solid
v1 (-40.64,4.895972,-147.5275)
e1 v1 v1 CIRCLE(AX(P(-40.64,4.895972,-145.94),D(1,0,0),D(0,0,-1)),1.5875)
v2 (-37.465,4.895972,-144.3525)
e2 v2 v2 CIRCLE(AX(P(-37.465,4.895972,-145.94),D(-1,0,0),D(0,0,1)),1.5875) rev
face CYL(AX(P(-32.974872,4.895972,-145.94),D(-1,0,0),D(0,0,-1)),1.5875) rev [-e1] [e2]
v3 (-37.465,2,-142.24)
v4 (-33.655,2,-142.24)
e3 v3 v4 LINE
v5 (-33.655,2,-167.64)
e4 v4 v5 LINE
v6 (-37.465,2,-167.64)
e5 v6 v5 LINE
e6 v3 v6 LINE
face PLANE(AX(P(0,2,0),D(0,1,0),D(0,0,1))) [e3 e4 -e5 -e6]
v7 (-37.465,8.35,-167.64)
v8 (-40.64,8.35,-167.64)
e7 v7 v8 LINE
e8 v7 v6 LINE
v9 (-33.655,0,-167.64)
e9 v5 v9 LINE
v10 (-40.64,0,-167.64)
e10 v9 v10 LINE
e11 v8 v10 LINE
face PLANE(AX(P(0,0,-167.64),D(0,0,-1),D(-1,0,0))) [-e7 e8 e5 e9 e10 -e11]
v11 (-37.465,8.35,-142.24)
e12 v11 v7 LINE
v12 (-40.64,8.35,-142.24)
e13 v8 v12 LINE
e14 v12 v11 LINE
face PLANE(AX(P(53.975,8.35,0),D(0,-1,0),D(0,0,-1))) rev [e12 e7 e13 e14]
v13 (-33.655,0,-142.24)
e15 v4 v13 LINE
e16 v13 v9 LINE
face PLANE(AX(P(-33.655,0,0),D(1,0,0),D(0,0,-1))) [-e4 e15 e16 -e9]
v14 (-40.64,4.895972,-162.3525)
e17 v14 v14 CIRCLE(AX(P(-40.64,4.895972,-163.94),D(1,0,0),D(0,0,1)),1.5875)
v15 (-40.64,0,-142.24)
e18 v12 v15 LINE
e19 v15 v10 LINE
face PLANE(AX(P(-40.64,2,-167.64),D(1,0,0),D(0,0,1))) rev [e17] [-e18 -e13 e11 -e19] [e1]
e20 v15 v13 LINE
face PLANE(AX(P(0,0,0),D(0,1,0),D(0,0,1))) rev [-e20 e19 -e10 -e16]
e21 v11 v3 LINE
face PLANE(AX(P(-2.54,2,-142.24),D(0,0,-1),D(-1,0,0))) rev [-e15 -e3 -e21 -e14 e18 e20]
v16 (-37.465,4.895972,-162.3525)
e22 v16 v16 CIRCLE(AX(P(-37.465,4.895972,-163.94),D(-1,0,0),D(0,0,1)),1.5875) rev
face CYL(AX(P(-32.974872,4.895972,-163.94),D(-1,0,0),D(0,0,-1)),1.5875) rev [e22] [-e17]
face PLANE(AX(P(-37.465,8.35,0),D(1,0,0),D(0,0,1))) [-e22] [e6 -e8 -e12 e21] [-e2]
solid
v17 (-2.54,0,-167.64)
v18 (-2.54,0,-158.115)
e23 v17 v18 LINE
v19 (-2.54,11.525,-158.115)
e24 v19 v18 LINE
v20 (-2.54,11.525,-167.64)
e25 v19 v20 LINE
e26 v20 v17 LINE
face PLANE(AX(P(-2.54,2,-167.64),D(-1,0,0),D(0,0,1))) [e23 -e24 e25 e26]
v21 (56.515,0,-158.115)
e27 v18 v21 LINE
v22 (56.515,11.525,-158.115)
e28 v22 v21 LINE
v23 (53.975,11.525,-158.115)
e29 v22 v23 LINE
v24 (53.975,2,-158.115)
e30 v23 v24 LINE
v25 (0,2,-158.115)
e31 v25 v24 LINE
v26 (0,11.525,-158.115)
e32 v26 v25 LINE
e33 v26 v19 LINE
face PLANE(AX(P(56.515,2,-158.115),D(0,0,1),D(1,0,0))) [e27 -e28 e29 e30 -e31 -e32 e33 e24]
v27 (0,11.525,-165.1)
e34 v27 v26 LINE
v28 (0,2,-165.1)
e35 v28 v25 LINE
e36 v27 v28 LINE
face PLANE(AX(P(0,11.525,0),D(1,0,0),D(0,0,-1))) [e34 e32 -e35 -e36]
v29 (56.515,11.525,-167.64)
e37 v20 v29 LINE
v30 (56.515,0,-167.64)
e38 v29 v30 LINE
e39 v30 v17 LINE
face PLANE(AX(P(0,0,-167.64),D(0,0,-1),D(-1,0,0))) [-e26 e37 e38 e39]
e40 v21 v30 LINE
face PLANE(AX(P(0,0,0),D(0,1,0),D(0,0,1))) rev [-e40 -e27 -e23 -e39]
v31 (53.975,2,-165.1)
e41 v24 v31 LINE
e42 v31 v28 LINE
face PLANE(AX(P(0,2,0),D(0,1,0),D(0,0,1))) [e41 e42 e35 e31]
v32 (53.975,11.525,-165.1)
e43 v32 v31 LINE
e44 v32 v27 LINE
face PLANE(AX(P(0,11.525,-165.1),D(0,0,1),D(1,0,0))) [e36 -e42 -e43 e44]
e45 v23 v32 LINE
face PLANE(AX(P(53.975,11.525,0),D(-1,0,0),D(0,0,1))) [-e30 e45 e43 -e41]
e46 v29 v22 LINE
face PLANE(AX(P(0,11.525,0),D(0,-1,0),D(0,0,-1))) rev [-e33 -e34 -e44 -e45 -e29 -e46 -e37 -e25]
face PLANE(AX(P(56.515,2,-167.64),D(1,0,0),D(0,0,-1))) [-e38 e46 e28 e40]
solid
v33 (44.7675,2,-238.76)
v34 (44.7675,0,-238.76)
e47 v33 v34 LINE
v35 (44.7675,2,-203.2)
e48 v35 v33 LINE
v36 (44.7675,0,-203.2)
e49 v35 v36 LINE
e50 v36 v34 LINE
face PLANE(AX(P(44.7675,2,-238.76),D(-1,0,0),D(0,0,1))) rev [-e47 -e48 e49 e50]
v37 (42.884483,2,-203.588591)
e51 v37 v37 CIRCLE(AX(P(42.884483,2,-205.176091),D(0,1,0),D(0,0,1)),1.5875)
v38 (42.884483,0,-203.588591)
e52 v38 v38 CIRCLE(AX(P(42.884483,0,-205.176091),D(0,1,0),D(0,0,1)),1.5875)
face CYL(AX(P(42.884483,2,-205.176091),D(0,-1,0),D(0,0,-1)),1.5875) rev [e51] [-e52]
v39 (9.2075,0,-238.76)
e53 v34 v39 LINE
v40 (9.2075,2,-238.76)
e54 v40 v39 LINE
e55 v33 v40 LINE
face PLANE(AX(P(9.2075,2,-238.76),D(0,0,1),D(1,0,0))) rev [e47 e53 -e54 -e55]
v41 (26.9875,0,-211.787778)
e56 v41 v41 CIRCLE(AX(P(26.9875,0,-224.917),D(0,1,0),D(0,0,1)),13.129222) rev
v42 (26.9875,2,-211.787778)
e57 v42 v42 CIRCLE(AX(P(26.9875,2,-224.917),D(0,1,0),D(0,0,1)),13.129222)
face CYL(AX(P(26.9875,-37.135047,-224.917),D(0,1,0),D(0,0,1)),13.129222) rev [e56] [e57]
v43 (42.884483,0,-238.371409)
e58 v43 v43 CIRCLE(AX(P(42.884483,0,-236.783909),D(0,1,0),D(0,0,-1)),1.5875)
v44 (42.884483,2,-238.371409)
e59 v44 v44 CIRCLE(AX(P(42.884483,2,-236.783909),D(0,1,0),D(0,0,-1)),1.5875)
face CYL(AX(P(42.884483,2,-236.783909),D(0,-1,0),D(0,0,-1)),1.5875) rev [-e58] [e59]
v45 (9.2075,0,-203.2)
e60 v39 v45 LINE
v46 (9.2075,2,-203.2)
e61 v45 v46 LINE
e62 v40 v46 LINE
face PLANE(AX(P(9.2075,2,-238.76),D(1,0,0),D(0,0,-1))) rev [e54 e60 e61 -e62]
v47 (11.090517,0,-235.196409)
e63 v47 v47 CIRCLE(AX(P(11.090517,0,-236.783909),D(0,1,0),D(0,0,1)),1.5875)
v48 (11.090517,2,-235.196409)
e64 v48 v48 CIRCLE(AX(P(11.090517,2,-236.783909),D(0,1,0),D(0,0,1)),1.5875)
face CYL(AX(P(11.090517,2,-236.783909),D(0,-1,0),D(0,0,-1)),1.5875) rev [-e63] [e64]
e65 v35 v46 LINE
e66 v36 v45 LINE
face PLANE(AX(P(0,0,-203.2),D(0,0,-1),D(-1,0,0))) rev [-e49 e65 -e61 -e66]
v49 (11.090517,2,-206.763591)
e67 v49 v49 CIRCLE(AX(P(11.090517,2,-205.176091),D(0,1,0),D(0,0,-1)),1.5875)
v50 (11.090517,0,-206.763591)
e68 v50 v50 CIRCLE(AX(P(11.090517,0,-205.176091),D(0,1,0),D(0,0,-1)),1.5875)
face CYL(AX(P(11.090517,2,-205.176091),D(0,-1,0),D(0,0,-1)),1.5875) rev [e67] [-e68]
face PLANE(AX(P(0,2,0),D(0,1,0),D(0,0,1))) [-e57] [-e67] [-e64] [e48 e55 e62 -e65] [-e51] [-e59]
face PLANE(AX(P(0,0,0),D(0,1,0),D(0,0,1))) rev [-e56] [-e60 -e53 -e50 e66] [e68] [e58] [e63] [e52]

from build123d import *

# Parameters (mm, degrees)
SKETCH2_W           = 59.055
SKETCH2_H           = 25.4
BOSS_EXTRUDE1_DEPTH = 2
BOSS_EXTRUDE2_START = 2
BOSS_EXTRUDE2_DEPTH = 9.525
SKETCH3_W           = 38.1
SKETCH3_H           = 25.4
BOSS_EXTRUDE3_DEPTH = 2
BOSS_EXTRUDE4_START = 2
SKETCH4_W           = 3.175
SKETCH4_H           = 25.4
BOSS_EXTRUDE4_DEPTH = 6.35
SKETCH5_R           = 1.5875
CUT_EXTRUDE1_DEPTH  = 3.175
SKETCH6_W           = 35.56
SKETCH6_H           = 71.12
SKETCH6_R           = 1.5875
BOSS_EXTRUDE5_DEPTH = 2
FILLET1_R           = 2.54
SKETCH10_R          = 13.129221829
CUT_EXTRUDE2_DEPTH  = 2
SPLIT3_START        = -40.64
SPLIT3_OUTLINE_W    = 2
SPLIT3_OUTLINE_H    = 25.4
SPLIT3_DEPTH        = 38.1
SPLIT3_2_OUTLINE_W  = 6.35
SPLIT3_2_OUTLINE_H  = 25.4
SPLIT3_2_OUTLINE_R  = 1.5875
SPLIT3_2_DEPTH      = 3.175
SPLIT3_3_OUTLINE_W  = 8.35
SPLIT3_3_OUTLINE_H  = 25.4
SPLIT3_3_OUTLINE_R  = 1.5875
SPLIT3_3_DEPTH      = 38.1
SPLIT3_START_2      = 56.515
SPLIT3_4_OUTLINE_W  = 8.35
SPLIT3_4_OUTLINE_H  = 25.4
SPLIT3_4_OUTLINE_R  = 1.5875
SPLIT3_4_DEPTH      = 38.1
SPLIT3_5_OUTLINE_W  = 2
SPLIT3_5_OUTLINE_H  = 25.4
SPLIT3_5_DEPTH      = 38.1
SPLIT3_START_3      = 91.44
SPLIT3_6_OUTLINE_W  = 6.35
SPLIT3_6_OUTLINE_H  = 25.4
SPLIT3_6_OUTLINE_R  = 1.5875
SPLIT3_6_DEPTH      = 3.175


# Read off the part's stored shape, not the designer's step: Split3, Split4
with BuildPart() as part:
    # Sketch2 → Boss-Extrude1 (new body)
    with BuildSketch(Plane(origin=(0, 0, 0), x_dir=(1, 0, 0), z_dir=(0, 1, 0))):
        with Locations((26.9875, 154.94)):
            Rectangle(SKETCH2_W, SKETCH2_H)
    extrude(amount=BOSS_EXTRUDE1_DEPTH)

    # Sketch1 → Boss-Extrude2 (add)
    with BuildSketch(Plane(origin=(0, 0, 0), x_dir=(1, 0, 0), z_dir=(0, 1, 0)).offset(BOSS_EXTRUDE2_START)):
        Polygon((-2.54, 167.64), (-2.54, 158.115), (0, 158.115), (0, 165.1), (53.975, 165.1), (53.975, 158.115), (56.515, 158.115), (56.515, 167.64), align=None)
    extrude(amount=BOSS_EXTRUDE2_DEPTH)

    # Sketch3 → Boss-Extrude3 (add)
    with BuildSketch(Plane(origin=(0, 0, 0), x_dir=(1, 0, 0), z_dir=(0, 1, 0))):
        with Locations((75.565, 154.94)):
            Rectangle(SKETCH3_W, SKETCH3_H)
    extrude(amount=BOSS_EXTRUDE3_DEPTH)

    # Sketch4 → Boss-Extrude4 (add)
    with BuildSketch(Plane(origin=(0, 0, 0), x_dir=(1, 0, 0), z_dir=(0, 1, 0)).offset(BOSS_EXTRUDE4_START)):
        with Locations((93.0275, 154.94)):
            Rectangle(SKETCH4_W, SKETCH4_H)
    extrude(amount=BOSS_EXTRUDE4_DEPTH)

    # Sketch5 → Cut-Extrude1 (cut)
    with BuildSketch(Plane(origin=(94.615, 0, 0), x_dir=(0, 0, -1), z_dir=(1, 0, 0))):
        with Locations((145.94, 4.895971622)):
            Circle(SKETCH5_R)
        with Locations(Location((163.94, 4.895971622, 0), (0, 0, 180))):
            Circle(SKETCH5_R)
    extrude(amount=-CUT_EXTRUDE1_DEPTH, mode=Mode.SUBTRACT)

    # Mirror1: part across plane


with BuildPart() as part_1:
    add(part.part)
    add(part.part.mirror(Plane(origin=(26.9875, 0, 0), x_dir=(0, 0, 1), z_dir=(1, 0, 0))))

    # Sketch6 → Boss-Extrude5 (add)
    with BuildSketch(Plane(origin=(0, 0, 0), x_dir=(1, 0, 0), z_dir=(0, 1, 0))):
        with Locations((26.9875, 203.2)):
            Rectangle(SKETCH6_W, SKETCH6_H)
        with Locations(Location((11.09051688, 236.783908574, 0), (0, 0, 270))):
            Circle(SKETCH6_R, mode=Mode.SUBTRACT)
        with Locations(Location((11.09051688, 205.176091426, 0), (0, 0, 90))):
            Circle(SKETCH6_R, mode=Mode.SUBTRACT)
        with Locations(Location((42.88448312, 205.176091426, 0), (0, 0, 270))):
            Circle(SKETCH6_R, mode=Mode.SUBTRACT)
        with Locations(Location((42.88448312, 236.783908574, 0), (0, 0, 90))):
            Circle(SKETCH6_R, mode=Mode.SUBTRACT)
    extrude(amount=BOSS_EXTRUDE5_DEPTH)

    # Fillet1
    fillet1_edges = [part_1.edges().sort_by_distance(p)[0] for p in [
        (26.9875, 2, -167.64),
    ]]
    fillet(fillet1_edges, radius=FILLET1_R)

    # Sketch10 → Cut-Extrude2 (cut)
    with BuildSketch(Plane(origin=(0, 2, 0), x_dir=(1, 0, 0), z_dir=(0, 1, 0))):
        with Locations(Location((26.9875, 224.917, 0), (0, 0, 270))):
            Circle(SKETCH10_R)
    extrude(amount=-CUT_EXTRUDE2_DEPTH, mode=Mode.SUBTRACT)


with BuildPart() as body_2:
    # Split1: the piece on the far side of the plane
    add(part_1.part)
    split(bisect_by=Plane(origin=(0, 0, -167.64), x_dir=(-1, 0, 0), z_dir=(0, 0, -1)), keep=Keep.BOTTOM)

    # Split3 3 outline → Split3 3 (cut)
    with BuildSketch(Plane.YZ.offset(SPLIT3_START)):
        with Locations((4.175, -154.94)):
            Rectangle(SPLIT3_3_OUTLINE_W, SPLIT3_3_OUTLINE_H)
        with Locations((4.895971622, -145.94)):
            Circle(SPLIT3_3_OUTLINE_R, mode=Mode.SUBTRACT)
        with Locations((4.895971622, -163.94)):
            Circle(SPLIT3_3_OUTLINE_R, mode=Mode.SUBTRACT)
    extrude(amount=SPLIT3_3_DEPTH, mode=Mode.SUBTRACT)

    # Split3 4 outline → Split3 4 (cut)
    with BuildSketch(Plane.YZ.offset(SPLIT3_START_2)):
        with Locations((4.175, -154.94)):
            Rectangle(SPLIT3_4_OUTLINE_W, SPLIT3_4_OUTLINE_H)
        with Locations((4.895971622, -145.94)):
            Circle(SPLIT3_4_OUTLINE_R, mode=Mode.SUBTRACT)
        with Locations((4.895971622, -163.94)):
            Circle(SPLIT3_4_OUTLINE_R, mode=Mode.SUBTRACT)
    extrude(amount=SPLIT3_4_DEPTH, mode=Mode.SUBTRACT)


with BuildPart() as part_2:
    add(part_1.part)

    # Split1
    split(bisect_by=Plane(origin=(0, 0, -167.64), x_dir=(-1, 0, 0), z_dir=(0, 0, -1)), keep=Keep.TOP)


with BuildPart() as body_3:
    # Split2: the piece on the far side of the plane
    add(part_2.part)
    split(bisect_by=Plane(origin=(0, 0, -203.2), x_dir=(-1, 0, 0), z_dir=(0, 0, -1)), keep=Keep.BOTTOM)


with BuildPart() as part_3:
    add(part_2.part)

    # Split2
    split(bisect_by=Plane(origin=(0, 0, -203.2), x_dir=(-1, 0, 0), z_dir=(0, 0, -1)), keep=Keep.TOP)


with BuildPart() as body_3_2:
    # Split3 outline → Split3 (new body)
    with BuildSketch(Plane.YZ.offset(SPLIT3_START)):
        with Locations((1, -154.94)):
            Rectangle(SPLIT3_OUTLINE_W, SPLIT3_OUTLINE_H)
    extrude(amount=SPLIT3_DEPTH)

    # Split3 2 outline → Split3 2 (add)
    with BuildSketch(Plane.YZ.offset(SPLIT3_START)):
        with Locations((5.175, -154.94)):
            Rectangle(SPLIT3_2_OUTLINE_W, SPLIT3_2_OUTLINE_H)
        with Locations((4.895971622, -163.94)):
            Circle(SPLIT3_2_OUTLINE_R, mode=Mode.SUBTRACT)
        with Locations((4.895971622, -145.94)):
            Circle(SPLIT3_2_OUTLINE_R, mode=Mode.SUBTRACT)
    extrude(amount=SPLIT3_2_DEPTH)


with BuildPart() as body_4:
    # Split3 5 outline → Split3 5 (new body)
    with BuildSketch(Plane.YZ.offset(SPLIT3_START_2)):
        with Locations((1, -154.94)):
            Rectangle(SPLIT3_5_OUTLINE_W, SPLIT3_5_OUTLINE_H)
    extrude(amount=SPLIT3_5_DEPTH)

    # Split3 6 outline → Split3 6 (add)
    with BuildSketch(Plane.YZ.offset(SPLIT3_START_3)):
        with Locations((5.175, -154.94)):
            Rectangle(SPLIT3_6_OUTLINE_W, SPLIT3_6_OUTLINE_H)
        with Locations((4.895971622, -163.94)):
            Circle(SPLIT3_6_OUTLINE_R, mode=Mode.SUBTRACT)
        with Locations((4.895971622, -145.94)):
            Circle(SPLIT3_6_OUTLINE_R, mode=Mode.SUBTRACT)
    extrude(amount=SPLIT3_6_DEPTH)


with BuildPart() as body_4_2:
    # Split4: the piece on the far side of the plane
    add(body_2.part)
    split(bisect_by=Plane.XY.offset(-158.115), keep=Keep.BOTTOM)


with BuildPart() as body_2_1:
    add(body_2.part)

    # Split4
    split(bisect_by=Plane.XY.offset(-158.115), keep=Keep.TOP)


with BuildPart() as body_4_3:
    # Split5: the piece on the far side of the plane
    add(body_3_2.part)
    split(bisect_by=Plane(origin=(-33.655, 0, 0), x_dir=(0, 0, 1), z_dir=(1, 0, 0)), keep=Keep.BOTTOM)


with BuildPart() as body_3_2_1:
    add(body_3_2.part)

    # Split5
    split(bisect_by=Plane(origin=(-33.655, 0, 0), x_dir=(0, 0, 1), z_dir=(1, 0, 0)), keep=Keep.TOP)


solid = Compound([part_3.part, body_4_2.part, body_4_3.part])
